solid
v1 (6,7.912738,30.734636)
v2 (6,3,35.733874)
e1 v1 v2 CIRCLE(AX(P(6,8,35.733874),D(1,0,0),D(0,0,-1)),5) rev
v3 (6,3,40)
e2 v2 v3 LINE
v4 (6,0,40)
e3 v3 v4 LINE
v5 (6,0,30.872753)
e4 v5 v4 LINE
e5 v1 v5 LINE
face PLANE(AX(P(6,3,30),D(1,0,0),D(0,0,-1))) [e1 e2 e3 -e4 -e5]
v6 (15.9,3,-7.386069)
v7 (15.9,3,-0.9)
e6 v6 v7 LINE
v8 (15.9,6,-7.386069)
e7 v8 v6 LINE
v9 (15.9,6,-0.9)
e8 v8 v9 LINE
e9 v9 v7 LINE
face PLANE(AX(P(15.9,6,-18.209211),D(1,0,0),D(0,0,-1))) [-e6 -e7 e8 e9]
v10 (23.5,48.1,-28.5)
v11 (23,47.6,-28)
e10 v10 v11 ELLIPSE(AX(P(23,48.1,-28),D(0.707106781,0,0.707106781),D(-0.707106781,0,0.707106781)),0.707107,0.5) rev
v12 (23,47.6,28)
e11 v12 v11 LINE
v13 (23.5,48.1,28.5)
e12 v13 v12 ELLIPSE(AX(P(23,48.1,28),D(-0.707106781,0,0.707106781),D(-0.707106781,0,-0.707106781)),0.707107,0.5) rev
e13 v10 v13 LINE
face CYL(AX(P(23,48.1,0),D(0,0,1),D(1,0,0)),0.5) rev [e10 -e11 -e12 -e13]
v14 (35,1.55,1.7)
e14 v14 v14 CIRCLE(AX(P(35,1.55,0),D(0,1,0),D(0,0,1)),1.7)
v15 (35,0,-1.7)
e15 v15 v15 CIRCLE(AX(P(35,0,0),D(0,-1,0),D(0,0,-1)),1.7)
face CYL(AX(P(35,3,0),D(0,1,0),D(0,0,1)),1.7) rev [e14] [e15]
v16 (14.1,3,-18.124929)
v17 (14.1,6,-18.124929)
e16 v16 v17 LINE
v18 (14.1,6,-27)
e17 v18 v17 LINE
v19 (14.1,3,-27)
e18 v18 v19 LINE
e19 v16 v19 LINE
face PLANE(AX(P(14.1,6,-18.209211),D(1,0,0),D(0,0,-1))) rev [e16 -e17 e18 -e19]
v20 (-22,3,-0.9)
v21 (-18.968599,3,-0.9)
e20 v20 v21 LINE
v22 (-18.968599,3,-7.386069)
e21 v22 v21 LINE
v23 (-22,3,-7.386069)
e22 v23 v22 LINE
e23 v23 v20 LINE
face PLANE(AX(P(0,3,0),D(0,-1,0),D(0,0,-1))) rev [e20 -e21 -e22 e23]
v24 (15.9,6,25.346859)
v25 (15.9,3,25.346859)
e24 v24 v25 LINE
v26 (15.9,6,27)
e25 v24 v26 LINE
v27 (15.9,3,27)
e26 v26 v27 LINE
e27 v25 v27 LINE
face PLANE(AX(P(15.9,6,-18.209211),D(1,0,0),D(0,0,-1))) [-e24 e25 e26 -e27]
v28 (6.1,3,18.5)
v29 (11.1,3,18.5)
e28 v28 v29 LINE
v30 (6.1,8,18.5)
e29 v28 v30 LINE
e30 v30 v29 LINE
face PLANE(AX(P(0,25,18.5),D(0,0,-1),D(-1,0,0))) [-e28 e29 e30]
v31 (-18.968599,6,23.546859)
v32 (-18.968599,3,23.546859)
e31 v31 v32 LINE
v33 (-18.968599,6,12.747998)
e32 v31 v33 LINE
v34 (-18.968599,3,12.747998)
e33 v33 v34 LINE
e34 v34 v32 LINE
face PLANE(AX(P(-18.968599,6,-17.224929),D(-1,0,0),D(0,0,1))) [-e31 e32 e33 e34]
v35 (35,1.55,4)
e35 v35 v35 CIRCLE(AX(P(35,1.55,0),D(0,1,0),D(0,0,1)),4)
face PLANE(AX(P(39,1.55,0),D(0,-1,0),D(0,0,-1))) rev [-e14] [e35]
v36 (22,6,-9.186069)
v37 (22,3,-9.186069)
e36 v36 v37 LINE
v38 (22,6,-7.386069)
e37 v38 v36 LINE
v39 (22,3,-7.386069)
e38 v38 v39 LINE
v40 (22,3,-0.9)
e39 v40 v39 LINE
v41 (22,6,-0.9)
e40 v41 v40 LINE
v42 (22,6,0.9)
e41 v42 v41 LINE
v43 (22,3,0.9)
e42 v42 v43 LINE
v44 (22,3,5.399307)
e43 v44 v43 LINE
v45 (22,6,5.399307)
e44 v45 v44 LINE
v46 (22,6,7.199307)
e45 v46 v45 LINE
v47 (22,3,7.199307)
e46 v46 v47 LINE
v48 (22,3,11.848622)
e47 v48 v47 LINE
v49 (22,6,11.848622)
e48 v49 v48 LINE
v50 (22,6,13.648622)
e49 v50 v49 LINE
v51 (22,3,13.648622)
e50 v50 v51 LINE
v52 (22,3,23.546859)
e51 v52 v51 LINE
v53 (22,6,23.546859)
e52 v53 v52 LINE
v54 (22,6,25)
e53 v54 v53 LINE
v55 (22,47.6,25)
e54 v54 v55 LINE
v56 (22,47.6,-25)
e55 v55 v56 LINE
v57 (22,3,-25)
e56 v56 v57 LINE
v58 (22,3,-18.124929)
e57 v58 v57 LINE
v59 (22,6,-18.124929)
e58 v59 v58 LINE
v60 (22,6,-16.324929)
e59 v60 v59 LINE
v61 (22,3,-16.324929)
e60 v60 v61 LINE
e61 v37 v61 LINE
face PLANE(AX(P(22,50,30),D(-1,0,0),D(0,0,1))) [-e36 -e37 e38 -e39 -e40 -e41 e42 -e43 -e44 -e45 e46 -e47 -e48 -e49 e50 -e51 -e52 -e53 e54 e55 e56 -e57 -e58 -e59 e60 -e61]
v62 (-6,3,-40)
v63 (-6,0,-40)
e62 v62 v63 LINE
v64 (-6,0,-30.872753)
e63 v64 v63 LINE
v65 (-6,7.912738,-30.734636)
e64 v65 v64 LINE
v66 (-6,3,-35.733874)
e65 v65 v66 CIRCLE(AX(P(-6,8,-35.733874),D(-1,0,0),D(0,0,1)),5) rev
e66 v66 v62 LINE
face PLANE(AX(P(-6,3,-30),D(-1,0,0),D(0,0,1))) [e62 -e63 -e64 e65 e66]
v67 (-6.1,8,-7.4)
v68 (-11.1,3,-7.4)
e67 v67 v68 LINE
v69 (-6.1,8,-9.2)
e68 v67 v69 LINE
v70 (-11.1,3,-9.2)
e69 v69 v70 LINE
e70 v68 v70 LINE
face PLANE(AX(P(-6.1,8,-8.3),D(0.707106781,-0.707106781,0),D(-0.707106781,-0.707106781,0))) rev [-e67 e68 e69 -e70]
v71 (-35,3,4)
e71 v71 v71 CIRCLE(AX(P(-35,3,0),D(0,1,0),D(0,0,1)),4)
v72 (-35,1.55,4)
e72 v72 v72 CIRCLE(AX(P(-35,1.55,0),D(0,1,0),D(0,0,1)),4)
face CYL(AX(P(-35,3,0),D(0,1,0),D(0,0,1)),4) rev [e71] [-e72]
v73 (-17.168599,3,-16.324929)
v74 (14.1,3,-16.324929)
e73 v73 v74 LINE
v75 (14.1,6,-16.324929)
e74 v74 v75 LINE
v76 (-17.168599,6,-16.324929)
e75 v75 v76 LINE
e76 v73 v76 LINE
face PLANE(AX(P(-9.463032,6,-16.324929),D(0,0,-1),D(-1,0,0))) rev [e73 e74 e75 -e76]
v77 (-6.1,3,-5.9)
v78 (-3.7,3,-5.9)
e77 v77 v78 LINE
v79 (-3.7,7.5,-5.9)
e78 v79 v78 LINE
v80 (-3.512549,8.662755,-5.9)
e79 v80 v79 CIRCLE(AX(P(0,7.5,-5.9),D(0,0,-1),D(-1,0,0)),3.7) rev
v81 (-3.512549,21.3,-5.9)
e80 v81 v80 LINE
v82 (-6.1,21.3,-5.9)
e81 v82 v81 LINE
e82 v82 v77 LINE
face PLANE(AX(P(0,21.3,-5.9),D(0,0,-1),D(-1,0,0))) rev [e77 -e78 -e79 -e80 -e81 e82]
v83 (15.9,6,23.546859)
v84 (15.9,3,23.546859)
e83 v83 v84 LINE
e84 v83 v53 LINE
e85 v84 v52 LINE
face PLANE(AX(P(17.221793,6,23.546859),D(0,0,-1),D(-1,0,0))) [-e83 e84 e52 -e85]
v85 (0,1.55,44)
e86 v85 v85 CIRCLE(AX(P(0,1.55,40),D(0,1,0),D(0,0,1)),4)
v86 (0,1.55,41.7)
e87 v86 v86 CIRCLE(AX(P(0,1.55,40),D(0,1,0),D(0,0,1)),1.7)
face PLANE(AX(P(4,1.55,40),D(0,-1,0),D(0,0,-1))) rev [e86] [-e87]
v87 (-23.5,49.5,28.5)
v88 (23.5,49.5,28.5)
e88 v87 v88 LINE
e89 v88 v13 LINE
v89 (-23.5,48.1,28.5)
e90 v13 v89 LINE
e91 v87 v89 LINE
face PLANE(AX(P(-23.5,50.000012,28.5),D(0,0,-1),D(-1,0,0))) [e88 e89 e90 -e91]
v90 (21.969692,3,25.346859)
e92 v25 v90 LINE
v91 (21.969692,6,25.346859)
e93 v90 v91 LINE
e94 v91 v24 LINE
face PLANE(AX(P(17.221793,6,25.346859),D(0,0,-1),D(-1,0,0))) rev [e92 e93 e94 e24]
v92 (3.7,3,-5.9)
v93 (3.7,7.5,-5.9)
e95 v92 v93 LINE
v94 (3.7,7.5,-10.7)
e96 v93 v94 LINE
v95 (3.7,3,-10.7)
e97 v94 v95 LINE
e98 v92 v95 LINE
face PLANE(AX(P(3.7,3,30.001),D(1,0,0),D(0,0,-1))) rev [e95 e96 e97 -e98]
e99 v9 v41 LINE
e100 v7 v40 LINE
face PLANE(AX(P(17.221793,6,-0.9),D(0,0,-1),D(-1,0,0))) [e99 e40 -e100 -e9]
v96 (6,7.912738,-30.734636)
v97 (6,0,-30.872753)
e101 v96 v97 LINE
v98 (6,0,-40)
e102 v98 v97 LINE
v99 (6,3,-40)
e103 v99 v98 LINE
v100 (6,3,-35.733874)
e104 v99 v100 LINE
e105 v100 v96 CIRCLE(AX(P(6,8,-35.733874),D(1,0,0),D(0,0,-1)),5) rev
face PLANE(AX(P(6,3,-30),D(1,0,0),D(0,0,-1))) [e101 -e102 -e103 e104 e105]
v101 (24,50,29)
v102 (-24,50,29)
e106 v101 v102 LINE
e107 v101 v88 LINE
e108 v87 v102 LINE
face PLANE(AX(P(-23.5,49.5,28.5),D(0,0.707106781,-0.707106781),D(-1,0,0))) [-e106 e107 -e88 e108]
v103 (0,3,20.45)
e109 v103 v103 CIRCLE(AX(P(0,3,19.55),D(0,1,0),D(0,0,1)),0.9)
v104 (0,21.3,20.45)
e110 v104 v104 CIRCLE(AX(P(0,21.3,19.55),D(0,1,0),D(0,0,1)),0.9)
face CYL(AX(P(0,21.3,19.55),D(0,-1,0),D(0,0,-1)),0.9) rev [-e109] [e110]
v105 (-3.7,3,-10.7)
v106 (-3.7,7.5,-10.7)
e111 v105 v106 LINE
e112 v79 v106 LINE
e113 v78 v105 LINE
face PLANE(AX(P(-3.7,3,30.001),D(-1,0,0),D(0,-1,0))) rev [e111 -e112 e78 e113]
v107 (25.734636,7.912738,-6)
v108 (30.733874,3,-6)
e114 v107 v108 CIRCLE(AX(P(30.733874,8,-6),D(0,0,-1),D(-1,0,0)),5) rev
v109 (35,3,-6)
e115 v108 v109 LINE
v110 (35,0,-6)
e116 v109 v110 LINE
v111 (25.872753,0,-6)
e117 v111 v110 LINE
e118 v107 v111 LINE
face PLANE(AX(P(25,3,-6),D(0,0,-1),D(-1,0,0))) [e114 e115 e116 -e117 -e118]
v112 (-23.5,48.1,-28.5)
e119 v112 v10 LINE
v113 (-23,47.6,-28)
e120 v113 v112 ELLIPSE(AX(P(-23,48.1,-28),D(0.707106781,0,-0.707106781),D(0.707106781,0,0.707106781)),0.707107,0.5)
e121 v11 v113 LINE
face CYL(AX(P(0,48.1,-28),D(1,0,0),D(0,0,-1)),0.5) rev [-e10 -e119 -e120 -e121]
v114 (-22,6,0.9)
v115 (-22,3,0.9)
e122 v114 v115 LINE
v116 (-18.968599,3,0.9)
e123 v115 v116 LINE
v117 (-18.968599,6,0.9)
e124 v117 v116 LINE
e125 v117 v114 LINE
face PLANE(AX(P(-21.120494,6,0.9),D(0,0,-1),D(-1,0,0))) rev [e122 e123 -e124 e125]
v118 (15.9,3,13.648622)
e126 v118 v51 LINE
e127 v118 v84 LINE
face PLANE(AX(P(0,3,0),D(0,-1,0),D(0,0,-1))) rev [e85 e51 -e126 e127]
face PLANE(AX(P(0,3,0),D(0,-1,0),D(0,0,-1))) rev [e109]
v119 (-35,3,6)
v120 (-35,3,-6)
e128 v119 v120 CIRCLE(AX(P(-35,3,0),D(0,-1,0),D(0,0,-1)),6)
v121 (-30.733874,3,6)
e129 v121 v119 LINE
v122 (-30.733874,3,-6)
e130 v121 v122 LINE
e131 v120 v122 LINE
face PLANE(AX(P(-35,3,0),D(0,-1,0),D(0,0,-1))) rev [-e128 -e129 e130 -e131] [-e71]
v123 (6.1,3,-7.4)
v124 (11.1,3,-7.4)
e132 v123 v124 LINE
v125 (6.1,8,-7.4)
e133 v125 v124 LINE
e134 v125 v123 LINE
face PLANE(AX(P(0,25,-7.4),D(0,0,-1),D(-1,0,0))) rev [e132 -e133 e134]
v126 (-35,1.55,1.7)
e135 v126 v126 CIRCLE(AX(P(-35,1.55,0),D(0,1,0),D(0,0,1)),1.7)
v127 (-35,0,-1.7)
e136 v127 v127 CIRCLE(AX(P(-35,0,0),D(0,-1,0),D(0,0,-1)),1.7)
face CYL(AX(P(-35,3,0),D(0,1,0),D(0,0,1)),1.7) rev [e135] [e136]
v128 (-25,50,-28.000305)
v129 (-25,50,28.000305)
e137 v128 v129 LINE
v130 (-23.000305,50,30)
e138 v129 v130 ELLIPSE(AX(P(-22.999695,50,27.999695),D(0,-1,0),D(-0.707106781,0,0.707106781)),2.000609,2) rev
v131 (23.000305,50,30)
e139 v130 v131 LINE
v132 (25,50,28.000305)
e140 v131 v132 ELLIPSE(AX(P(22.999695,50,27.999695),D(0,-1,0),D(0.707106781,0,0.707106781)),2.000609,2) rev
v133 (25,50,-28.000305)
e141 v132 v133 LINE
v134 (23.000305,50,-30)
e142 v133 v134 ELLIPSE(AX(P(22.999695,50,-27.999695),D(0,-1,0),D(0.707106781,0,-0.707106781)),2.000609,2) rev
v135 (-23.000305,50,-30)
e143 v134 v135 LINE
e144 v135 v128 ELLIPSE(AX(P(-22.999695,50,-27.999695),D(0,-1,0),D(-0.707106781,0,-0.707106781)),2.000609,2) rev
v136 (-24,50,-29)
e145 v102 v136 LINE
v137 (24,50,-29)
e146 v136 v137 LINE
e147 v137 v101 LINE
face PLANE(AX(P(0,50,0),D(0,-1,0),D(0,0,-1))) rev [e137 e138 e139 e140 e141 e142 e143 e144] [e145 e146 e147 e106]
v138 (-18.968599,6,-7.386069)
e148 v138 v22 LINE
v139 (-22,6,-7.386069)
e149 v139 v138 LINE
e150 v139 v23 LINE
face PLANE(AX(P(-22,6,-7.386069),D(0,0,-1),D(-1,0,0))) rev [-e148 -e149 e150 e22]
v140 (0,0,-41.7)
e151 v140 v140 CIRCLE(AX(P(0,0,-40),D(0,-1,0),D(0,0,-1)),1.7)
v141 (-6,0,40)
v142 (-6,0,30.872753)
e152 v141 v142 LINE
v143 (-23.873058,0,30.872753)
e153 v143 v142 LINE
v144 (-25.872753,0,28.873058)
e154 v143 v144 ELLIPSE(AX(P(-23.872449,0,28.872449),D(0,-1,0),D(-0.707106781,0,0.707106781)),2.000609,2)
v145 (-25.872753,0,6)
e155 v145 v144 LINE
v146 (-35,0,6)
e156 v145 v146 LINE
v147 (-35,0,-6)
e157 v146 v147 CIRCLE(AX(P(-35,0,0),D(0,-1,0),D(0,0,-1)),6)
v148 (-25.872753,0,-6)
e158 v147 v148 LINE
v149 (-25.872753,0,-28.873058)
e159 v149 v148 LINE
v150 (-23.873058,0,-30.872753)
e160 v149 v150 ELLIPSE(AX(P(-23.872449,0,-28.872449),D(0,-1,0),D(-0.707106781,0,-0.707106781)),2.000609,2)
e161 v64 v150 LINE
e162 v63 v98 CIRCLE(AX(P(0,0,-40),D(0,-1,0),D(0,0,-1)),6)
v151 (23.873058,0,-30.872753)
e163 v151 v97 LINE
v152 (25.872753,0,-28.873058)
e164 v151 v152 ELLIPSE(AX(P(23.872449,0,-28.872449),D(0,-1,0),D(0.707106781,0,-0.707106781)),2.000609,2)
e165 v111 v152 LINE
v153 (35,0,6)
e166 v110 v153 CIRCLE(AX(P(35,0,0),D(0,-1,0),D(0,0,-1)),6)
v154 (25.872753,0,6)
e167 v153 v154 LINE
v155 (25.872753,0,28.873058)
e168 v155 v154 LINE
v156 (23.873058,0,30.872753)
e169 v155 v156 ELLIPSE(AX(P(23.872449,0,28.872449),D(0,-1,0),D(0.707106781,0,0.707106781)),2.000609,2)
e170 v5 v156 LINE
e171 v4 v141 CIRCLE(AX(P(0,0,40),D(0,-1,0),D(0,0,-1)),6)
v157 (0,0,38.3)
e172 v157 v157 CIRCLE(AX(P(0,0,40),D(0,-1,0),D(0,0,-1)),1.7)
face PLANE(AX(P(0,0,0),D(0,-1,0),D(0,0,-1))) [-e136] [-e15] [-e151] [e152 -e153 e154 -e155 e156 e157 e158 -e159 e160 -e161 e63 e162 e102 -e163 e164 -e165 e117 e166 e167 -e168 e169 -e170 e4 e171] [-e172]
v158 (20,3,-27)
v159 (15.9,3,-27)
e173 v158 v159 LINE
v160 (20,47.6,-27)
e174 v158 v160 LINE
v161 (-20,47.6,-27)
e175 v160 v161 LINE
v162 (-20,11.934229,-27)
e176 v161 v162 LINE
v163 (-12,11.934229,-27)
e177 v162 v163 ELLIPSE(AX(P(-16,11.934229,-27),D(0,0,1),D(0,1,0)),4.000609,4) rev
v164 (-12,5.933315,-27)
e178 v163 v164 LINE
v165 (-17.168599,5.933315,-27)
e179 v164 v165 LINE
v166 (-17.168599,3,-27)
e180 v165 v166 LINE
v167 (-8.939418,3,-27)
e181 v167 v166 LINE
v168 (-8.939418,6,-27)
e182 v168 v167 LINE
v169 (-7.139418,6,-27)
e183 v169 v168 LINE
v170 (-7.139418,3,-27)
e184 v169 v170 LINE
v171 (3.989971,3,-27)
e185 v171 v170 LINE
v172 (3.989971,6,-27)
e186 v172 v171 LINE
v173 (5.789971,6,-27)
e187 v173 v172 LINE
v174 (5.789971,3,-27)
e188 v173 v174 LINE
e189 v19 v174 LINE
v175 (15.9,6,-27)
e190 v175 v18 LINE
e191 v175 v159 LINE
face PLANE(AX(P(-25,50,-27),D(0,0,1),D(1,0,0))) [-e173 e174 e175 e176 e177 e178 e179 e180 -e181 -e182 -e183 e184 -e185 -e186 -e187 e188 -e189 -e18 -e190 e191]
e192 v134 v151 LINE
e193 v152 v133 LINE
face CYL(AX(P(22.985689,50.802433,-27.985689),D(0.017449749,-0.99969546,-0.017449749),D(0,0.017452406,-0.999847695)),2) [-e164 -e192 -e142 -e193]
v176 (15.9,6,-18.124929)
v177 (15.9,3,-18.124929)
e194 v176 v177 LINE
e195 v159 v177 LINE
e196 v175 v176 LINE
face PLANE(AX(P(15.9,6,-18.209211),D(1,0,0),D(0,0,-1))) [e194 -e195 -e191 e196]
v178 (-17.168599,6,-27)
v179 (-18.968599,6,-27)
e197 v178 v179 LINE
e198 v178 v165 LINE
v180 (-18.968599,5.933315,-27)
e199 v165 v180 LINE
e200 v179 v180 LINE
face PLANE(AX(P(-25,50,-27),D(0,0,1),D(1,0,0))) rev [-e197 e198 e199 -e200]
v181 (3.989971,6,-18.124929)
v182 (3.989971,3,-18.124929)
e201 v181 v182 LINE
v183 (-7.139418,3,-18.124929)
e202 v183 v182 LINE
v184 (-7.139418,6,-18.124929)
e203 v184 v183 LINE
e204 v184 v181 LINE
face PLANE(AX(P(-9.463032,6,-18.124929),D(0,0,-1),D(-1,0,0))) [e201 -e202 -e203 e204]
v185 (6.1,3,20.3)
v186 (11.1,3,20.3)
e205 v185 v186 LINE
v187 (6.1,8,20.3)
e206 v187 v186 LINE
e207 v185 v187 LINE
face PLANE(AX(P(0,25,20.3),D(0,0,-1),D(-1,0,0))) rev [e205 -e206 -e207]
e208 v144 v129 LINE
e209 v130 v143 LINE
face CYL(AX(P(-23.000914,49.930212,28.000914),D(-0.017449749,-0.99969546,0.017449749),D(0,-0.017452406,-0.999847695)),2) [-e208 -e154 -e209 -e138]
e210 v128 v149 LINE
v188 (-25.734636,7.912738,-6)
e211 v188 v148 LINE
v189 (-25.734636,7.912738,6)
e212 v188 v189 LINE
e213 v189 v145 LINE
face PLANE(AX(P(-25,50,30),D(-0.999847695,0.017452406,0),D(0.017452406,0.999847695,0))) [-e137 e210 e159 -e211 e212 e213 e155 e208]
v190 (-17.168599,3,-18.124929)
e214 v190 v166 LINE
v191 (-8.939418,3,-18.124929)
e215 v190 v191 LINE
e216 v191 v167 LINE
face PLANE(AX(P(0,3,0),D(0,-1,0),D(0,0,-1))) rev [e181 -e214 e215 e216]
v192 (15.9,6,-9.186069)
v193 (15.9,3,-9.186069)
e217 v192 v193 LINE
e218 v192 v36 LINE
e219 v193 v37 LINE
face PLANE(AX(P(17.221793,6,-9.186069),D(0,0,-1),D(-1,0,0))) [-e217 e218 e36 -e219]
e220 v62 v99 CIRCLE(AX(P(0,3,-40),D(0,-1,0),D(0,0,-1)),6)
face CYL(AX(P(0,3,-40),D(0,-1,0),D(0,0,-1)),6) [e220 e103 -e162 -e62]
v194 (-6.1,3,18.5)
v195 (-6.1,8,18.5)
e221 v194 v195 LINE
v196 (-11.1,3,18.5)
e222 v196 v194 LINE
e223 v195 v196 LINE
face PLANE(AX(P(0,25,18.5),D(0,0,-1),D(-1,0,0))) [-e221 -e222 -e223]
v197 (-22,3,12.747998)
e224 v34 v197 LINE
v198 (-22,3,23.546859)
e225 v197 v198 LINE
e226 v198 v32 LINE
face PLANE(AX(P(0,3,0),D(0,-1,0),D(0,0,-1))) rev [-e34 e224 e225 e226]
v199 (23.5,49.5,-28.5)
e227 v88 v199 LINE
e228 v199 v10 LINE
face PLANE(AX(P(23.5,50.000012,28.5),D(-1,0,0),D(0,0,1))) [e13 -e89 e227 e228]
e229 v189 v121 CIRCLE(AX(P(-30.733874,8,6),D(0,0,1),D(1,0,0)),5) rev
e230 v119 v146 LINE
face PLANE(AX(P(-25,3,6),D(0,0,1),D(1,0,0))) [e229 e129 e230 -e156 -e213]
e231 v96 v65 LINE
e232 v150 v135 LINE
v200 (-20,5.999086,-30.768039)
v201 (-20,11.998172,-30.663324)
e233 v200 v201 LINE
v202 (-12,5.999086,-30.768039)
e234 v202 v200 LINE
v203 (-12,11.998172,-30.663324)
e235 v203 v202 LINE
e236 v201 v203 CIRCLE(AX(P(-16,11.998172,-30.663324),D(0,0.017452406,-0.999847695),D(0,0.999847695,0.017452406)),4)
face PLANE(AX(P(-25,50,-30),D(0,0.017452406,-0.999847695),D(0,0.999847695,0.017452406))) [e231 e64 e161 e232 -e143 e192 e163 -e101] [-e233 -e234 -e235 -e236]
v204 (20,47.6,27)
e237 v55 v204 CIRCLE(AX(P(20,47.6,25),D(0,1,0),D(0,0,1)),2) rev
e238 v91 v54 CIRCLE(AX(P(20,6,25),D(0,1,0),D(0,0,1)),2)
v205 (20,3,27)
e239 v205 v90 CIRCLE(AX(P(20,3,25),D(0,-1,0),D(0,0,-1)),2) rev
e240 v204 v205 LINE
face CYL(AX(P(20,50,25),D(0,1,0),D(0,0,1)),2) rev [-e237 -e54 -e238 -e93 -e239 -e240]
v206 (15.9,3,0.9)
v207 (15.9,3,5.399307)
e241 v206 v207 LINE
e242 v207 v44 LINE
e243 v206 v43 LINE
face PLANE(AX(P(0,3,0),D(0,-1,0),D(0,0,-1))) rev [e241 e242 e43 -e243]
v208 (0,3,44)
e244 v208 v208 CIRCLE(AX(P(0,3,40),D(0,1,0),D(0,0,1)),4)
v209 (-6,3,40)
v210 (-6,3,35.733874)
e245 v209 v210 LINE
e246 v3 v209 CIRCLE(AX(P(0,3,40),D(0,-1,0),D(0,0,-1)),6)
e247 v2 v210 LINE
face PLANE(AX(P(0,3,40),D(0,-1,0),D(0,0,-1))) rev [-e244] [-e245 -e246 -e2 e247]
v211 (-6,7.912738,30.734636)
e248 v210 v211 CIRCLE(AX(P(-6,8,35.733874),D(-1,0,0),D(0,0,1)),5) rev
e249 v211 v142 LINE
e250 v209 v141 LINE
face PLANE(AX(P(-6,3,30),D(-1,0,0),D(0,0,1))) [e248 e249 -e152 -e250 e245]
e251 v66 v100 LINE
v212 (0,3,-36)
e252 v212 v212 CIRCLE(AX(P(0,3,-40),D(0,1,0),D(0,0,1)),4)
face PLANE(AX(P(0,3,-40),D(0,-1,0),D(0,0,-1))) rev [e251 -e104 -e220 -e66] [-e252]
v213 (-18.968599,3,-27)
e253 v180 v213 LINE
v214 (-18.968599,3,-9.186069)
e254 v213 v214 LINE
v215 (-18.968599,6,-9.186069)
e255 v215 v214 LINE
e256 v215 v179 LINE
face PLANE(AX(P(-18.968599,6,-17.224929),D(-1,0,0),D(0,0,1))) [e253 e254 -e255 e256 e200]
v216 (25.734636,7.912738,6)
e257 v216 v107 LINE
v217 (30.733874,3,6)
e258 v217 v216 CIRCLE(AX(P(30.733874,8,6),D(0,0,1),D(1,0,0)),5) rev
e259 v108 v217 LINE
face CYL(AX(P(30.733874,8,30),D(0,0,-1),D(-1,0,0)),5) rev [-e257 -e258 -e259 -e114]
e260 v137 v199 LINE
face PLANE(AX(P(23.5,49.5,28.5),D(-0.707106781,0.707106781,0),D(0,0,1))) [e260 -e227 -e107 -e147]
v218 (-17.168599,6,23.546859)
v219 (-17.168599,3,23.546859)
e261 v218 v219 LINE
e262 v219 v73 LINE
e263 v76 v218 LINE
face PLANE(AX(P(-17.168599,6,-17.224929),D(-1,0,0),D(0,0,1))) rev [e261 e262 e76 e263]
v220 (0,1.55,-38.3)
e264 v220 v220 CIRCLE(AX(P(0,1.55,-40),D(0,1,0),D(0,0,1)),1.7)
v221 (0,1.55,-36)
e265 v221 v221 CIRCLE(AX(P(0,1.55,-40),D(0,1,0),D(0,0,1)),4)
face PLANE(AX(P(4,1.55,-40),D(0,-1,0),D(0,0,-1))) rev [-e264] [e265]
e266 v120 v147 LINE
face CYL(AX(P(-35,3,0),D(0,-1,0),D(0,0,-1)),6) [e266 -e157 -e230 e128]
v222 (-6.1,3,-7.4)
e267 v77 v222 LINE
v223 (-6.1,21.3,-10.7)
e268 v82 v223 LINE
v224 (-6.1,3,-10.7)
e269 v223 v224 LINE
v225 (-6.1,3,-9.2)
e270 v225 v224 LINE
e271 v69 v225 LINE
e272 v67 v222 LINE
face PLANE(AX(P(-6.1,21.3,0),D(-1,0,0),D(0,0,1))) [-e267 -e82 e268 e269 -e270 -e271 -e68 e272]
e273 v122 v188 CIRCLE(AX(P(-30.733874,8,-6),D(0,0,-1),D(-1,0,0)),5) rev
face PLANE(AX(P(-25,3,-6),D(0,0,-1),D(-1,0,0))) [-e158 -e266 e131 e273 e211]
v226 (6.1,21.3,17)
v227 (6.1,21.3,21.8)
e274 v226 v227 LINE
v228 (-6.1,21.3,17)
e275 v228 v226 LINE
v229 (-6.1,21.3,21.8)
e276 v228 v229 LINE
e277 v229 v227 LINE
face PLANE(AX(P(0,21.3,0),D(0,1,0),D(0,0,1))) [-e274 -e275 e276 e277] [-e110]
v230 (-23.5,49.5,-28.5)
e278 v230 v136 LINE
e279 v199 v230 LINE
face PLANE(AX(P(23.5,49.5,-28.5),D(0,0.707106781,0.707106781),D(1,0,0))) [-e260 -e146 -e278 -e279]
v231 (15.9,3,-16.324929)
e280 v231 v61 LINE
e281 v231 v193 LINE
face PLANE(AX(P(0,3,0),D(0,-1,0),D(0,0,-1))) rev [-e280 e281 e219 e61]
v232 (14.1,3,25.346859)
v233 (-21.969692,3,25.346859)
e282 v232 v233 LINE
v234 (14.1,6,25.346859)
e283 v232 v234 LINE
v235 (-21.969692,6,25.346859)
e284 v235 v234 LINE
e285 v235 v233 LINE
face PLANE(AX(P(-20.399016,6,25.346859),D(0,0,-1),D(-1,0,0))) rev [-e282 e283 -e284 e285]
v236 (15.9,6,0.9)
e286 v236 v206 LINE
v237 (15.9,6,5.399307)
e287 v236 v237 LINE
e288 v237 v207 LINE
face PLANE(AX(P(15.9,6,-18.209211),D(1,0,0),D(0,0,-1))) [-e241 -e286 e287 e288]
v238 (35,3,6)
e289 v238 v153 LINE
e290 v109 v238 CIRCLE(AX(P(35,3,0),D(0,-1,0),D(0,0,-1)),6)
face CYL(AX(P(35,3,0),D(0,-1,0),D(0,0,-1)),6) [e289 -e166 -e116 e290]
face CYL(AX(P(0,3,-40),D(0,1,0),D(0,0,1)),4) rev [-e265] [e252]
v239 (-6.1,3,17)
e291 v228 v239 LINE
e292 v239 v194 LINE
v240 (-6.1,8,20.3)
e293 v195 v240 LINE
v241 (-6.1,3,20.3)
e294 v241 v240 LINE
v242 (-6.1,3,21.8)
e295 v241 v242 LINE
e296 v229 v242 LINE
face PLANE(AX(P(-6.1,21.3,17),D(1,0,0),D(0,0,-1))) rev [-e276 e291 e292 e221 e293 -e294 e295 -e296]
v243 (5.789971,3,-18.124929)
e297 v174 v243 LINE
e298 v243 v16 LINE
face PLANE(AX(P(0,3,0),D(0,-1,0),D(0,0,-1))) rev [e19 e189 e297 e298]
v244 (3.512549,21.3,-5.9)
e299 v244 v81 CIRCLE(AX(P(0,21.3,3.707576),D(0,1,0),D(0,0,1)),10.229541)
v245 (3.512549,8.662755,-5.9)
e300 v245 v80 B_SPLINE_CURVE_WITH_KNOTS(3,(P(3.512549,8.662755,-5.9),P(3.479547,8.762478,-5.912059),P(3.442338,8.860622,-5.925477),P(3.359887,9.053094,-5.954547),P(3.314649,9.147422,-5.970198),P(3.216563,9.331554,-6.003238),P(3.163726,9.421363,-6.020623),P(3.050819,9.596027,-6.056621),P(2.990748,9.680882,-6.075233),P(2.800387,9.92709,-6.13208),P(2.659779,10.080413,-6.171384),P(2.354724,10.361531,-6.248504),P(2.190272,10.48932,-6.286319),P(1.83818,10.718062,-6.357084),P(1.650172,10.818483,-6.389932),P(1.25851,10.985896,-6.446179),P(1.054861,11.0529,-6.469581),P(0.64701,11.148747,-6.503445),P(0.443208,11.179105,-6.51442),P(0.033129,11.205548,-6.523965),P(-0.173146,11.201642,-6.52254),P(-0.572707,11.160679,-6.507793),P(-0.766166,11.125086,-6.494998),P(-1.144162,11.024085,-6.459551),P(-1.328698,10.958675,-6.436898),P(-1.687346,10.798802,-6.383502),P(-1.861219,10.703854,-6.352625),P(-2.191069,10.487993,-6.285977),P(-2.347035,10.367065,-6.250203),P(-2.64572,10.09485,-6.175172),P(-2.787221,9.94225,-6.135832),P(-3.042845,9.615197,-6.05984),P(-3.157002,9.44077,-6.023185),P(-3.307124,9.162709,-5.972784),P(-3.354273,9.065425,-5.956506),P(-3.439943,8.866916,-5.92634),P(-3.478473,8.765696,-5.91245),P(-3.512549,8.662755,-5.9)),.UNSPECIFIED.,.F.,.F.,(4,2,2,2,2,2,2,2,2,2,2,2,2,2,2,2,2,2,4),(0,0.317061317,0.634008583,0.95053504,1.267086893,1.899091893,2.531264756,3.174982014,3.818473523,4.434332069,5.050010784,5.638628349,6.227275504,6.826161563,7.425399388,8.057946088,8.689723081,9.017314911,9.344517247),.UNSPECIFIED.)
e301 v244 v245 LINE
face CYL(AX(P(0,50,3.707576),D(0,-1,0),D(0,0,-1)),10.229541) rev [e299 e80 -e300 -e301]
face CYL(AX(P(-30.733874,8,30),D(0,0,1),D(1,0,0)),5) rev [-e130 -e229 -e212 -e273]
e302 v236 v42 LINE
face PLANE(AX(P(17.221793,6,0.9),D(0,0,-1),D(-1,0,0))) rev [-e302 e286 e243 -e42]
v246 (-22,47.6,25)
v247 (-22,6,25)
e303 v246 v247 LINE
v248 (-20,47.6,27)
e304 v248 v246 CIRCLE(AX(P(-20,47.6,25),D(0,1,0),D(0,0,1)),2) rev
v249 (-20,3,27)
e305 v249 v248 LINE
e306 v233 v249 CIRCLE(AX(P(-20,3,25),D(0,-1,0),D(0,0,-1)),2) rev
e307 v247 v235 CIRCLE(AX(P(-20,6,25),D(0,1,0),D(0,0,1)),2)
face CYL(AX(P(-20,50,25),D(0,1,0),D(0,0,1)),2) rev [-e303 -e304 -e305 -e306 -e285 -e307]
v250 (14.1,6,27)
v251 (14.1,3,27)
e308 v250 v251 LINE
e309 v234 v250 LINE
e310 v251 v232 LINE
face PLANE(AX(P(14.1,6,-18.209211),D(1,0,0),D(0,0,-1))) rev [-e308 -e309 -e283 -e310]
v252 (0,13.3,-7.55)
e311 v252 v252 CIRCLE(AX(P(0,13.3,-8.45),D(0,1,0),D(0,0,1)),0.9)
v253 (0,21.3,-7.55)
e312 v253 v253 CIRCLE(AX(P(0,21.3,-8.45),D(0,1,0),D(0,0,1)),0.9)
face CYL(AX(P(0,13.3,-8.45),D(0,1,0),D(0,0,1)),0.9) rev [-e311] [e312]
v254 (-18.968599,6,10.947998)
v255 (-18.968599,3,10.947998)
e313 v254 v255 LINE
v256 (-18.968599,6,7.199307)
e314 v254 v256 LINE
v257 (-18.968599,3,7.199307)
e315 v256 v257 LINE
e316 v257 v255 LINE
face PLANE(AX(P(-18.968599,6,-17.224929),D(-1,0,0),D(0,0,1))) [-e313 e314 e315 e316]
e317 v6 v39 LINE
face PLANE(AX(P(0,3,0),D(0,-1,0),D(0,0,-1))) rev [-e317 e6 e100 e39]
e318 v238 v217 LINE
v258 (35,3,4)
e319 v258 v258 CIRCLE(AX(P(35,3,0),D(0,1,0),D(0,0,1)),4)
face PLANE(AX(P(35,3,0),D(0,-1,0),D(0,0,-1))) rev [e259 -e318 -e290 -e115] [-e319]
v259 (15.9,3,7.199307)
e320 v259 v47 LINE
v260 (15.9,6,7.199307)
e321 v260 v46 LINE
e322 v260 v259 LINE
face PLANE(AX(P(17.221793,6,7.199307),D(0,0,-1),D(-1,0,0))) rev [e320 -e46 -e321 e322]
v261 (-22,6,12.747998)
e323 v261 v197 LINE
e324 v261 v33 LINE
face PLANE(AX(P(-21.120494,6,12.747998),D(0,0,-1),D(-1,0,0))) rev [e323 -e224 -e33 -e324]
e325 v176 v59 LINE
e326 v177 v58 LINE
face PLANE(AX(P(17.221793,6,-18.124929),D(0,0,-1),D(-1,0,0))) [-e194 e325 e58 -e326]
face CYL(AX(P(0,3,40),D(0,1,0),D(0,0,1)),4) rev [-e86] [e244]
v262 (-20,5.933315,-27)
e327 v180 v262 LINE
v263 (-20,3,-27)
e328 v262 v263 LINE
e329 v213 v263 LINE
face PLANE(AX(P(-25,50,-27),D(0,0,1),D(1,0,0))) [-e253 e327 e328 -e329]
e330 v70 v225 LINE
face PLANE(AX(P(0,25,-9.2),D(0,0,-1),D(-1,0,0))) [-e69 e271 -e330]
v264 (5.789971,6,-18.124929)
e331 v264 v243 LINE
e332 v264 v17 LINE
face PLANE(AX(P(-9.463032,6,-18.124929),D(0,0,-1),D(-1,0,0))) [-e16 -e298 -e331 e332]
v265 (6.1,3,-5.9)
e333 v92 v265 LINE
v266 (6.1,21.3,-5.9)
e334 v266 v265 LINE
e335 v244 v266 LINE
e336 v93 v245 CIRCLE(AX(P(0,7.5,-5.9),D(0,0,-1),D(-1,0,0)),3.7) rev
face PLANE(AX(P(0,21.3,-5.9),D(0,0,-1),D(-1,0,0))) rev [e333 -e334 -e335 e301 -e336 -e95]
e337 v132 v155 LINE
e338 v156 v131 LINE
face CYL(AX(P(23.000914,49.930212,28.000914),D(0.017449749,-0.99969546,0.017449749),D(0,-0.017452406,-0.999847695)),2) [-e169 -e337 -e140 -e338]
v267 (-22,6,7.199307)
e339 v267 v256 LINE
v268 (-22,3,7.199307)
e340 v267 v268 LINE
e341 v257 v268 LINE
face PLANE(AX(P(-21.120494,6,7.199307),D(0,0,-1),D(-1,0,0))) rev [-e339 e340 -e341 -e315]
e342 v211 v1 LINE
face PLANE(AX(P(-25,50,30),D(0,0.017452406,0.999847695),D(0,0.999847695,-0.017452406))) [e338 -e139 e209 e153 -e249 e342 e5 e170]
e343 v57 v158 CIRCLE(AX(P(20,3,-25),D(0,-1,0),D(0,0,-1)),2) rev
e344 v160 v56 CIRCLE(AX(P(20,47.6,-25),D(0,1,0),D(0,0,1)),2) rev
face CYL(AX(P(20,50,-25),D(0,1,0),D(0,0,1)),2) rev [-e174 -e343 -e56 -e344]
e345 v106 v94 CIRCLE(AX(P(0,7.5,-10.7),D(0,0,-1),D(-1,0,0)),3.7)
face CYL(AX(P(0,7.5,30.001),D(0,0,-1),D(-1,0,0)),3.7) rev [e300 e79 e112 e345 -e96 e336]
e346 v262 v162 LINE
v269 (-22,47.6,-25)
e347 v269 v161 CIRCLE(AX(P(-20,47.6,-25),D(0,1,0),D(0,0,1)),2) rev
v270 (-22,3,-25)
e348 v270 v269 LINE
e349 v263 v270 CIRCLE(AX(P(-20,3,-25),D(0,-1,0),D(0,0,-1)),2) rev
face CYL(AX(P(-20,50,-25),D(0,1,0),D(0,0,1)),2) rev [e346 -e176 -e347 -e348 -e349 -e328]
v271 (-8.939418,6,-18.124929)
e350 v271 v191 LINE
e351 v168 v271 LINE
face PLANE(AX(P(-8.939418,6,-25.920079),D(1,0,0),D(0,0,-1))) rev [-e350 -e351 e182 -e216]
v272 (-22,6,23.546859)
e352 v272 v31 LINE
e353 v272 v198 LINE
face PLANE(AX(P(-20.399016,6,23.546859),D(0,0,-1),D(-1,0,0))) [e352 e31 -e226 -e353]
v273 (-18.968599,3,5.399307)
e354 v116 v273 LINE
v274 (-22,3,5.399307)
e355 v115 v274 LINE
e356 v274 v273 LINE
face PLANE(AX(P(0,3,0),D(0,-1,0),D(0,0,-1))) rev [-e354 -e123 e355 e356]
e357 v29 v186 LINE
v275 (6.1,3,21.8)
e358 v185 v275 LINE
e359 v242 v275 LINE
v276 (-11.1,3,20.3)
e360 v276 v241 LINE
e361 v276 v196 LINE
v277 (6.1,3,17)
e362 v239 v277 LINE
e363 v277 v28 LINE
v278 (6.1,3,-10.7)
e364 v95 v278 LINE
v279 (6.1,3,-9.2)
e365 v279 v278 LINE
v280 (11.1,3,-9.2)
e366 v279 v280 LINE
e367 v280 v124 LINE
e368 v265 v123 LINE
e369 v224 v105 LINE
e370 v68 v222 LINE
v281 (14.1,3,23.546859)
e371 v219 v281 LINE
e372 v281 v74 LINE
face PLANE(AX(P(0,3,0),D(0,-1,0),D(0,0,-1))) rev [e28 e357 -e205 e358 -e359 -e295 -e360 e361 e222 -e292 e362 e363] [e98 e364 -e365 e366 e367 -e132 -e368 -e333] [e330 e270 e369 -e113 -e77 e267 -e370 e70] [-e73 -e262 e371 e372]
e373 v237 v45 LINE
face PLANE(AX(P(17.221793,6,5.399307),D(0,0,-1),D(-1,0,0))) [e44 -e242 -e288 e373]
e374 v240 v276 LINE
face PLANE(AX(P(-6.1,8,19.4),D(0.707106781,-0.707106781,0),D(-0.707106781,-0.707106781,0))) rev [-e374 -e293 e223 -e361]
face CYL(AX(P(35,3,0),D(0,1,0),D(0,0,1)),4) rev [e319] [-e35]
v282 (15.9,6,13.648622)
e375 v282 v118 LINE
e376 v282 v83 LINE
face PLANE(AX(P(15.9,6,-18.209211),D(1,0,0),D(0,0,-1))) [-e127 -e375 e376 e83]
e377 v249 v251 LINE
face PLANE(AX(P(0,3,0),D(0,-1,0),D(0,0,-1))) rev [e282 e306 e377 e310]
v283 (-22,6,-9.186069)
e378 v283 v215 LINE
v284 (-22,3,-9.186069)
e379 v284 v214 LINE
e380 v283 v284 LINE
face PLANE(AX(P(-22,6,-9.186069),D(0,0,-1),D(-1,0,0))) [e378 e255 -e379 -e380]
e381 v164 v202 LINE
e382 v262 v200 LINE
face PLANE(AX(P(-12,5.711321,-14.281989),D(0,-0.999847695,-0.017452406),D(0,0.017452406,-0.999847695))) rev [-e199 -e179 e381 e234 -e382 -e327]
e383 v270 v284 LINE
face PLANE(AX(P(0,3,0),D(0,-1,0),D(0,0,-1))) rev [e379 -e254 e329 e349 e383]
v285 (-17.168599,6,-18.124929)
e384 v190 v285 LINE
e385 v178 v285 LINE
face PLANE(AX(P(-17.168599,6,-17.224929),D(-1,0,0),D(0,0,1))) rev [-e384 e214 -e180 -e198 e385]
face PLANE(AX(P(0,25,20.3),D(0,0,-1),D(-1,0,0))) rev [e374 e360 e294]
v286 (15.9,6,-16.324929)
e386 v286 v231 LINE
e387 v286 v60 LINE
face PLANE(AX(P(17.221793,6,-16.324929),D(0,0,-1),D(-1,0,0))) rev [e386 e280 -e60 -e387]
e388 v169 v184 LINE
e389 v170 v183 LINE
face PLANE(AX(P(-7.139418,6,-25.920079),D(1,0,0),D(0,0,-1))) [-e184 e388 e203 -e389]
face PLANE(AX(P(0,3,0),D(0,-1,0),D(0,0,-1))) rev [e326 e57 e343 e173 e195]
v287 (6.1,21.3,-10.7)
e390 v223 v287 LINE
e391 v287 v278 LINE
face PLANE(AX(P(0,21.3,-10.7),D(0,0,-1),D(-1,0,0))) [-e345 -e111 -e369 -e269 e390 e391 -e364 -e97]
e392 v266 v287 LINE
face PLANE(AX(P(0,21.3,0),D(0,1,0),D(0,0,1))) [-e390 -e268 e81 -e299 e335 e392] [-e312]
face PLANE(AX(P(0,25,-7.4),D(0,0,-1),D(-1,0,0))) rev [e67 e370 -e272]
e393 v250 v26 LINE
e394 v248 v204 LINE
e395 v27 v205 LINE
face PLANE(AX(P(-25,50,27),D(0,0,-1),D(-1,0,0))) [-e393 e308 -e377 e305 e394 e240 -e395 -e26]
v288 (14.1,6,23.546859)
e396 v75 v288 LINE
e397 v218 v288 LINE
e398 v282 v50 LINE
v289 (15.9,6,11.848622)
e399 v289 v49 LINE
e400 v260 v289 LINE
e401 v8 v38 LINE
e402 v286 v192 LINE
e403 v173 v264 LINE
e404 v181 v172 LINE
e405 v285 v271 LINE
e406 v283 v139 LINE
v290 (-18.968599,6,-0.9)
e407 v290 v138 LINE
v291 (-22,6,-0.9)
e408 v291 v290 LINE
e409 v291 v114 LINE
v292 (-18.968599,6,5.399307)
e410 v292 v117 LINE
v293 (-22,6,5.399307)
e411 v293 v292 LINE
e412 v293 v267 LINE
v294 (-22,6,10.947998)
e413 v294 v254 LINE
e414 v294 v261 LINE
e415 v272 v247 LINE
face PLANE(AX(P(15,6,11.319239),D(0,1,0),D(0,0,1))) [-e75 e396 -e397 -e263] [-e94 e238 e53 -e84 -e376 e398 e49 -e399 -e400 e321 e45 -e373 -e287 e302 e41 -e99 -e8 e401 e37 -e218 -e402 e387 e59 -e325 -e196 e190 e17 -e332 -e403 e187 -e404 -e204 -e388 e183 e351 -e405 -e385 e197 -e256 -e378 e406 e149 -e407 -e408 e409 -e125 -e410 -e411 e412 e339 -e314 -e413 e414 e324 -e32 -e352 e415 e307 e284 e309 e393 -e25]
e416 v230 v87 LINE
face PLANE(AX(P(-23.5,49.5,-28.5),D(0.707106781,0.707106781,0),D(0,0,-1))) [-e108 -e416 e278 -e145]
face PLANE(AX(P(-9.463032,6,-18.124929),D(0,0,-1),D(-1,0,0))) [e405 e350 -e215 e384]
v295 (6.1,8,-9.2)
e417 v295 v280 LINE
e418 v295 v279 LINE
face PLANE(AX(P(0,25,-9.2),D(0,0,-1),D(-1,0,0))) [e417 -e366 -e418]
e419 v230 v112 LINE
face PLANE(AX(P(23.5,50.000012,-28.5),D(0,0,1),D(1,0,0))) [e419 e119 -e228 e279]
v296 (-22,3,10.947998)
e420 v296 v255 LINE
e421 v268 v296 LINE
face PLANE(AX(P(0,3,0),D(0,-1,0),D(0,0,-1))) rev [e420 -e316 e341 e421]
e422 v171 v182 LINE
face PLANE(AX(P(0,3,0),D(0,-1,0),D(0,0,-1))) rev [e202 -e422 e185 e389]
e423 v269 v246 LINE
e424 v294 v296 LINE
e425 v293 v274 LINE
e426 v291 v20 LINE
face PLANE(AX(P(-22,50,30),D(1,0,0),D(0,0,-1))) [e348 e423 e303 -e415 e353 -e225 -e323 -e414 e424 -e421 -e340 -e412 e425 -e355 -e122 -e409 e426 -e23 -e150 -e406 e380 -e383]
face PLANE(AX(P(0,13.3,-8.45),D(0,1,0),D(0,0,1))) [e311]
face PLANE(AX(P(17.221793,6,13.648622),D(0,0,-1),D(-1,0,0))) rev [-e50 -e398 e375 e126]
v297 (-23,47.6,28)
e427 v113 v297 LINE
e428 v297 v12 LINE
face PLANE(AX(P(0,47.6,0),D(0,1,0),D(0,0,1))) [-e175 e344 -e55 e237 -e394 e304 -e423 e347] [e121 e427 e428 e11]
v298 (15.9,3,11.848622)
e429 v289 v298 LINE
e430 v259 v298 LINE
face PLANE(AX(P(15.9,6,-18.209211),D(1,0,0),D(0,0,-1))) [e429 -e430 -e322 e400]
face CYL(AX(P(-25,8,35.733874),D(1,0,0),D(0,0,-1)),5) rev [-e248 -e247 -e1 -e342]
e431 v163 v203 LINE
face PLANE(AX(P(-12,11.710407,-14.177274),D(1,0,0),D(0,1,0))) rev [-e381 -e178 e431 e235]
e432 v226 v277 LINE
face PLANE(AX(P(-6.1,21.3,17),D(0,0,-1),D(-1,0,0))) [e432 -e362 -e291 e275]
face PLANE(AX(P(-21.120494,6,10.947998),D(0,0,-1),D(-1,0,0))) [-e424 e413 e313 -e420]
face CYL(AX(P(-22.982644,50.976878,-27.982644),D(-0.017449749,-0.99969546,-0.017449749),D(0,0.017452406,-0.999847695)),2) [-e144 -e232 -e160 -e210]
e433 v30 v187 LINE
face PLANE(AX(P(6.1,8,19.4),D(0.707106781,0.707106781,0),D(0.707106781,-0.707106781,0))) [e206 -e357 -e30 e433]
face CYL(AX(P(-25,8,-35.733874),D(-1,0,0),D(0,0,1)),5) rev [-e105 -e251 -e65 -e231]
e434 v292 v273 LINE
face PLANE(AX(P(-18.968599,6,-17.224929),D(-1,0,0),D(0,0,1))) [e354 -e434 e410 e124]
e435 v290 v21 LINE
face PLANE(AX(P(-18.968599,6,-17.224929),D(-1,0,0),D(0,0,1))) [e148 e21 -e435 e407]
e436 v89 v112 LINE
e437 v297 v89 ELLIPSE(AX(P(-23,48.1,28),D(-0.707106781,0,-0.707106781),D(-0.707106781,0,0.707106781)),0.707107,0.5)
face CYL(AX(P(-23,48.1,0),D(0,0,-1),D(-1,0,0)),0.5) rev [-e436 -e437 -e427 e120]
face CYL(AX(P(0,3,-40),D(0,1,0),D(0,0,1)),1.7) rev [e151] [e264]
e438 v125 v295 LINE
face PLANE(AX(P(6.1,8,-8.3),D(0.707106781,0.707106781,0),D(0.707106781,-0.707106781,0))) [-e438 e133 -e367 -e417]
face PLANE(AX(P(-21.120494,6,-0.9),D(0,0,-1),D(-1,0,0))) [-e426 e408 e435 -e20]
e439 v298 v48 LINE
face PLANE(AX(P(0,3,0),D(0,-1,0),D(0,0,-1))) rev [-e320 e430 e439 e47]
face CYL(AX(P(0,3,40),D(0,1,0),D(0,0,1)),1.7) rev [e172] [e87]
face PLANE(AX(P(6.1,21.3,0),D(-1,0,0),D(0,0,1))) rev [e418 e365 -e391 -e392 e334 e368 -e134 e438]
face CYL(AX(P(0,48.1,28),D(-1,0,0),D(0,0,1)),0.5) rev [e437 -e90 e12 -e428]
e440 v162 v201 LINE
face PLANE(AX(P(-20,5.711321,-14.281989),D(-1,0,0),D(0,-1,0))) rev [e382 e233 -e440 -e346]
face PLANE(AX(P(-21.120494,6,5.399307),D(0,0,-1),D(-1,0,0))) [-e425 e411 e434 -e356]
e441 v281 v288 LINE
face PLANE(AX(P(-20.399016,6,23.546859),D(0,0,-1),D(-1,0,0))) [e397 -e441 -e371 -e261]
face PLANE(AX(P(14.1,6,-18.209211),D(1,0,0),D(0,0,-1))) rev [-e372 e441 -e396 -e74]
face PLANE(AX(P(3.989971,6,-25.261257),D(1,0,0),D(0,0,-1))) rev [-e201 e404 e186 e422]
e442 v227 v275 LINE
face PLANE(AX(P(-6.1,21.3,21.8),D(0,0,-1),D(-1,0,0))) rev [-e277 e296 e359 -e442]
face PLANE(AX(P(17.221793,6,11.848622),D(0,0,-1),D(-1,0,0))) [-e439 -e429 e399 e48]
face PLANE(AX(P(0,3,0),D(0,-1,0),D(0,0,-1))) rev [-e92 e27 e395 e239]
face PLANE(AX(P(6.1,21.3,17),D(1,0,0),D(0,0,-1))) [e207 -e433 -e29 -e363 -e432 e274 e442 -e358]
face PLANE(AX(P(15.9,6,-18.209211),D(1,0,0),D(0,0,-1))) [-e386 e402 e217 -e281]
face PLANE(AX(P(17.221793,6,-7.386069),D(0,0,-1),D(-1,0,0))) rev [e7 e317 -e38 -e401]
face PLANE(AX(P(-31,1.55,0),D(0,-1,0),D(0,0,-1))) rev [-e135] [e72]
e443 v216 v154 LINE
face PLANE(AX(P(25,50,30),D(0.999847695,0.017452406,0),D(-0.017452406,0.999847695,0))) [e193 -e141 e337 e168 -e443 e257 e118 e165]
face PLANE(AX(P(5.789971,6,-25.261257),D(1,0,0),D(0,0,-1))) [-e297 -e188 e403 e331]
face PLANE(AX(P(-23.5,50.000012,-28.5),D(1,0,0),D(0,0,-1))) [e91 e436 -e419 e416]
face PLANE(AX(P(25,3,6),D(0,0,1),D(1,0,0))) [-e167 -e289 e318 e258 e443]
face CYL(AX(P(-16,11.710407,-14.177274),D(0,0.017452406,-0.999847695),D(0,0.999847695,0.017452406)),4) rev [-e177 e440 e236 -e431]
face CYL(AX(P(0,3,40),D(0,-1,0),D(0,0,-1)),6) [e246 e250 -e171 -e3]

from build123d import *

# Parameters (mm, degrees)
CROQUIS1_W                   = 50
CROQUIS1_H                   = 60
SALIENTE_EXTRUIR1_DEPTH      = 50
VACIADO1_T                   = -3
CROQUIS2_W                   = 12.2
CROQUIS2_H                   = 4.8
CROQUIS2_R                   = 0.9
SALIENTE_EXTRUIR2_DEPTH      = 18.3
CORTAR_EXTRUIR1_REACH        = 71.148
CORTAR_EXTRUIR2_START        = 18.3
CROQUIS2_3_R                 = 0.9
CORTAR_EXTRUIR2_DEPTH        = 8
CORTAR_EXTRUIR3_DEPTH        = 64.442887702
CORTAR_EXTRUIR3_DEPTH_BACK   = 2.4
CROQUIS5_W                   = 47
CROQUIS5_H                   = 57
REDONDEO1_R                  = 0.5
CHAFL_N1_SIZE                = 0.5
SALIENTE_EXTRUIR3_DEPTH      = 3
NGULO_DE_SALIDA5_ANGLE       = 1
REDONDEO3_R                  = 5
TALADROAVANZADO1_START       = 1.55
TALADROAVANZADO1_OUTLINE_R   = 4
TALADROAVANZADO1_DEPTH       = 1.45
TALADROAVANZADO1_2_OUTLINE_R = 1.7
TALADROAVANZADO1_2_DEPTH     = 1.55
NERVIO4_START                = -0.9
NERVIO4_DEPTH                = 1.8
NERVIO5_REACH                = 86.436
CROQUIS16_WALL_W             = 7.071067812
CROQUIS16_WALL_H             = 1.8
CORTAR_EXTRUIR8_DEPTH        = 68.975657408
CORTAR_EXTRUIR8_DEPTH_BACK   = 13
NERVIO9_START                = -3
NERVIO9_OUTLINE_W            = 31.268599093
NERVIO9_OUTLINE_H            = 39.871788568
NERVIO9_DEPTH                = 3
REDONDEO4_R                  = 2
REDONDEO5_R                  = 2
CORTAR_EXTRUIR9_REACH        = 102.177


# Read off the part's stored shape, not the designer's step: TaladroAvanzado1, Nervio4, Nervio9
with BuildPart() as part:
    # Croquis1 → Saliente-Extruir1 (new body)
    with BuildSketch(Plane(origin=(0, 0, 0), x_dir=(1, 0, 0), z_dir=(0, 1, 0))):
        Rectangle(CROQUIS1_W, CROQUIS1_H)
    extrude(amount=SALIENTE_EXTRUIR1_DEPTH)

    # Vaciado1
    vaciado1_openings = [part.faces().sort_by_distance(p)[0] for p in [
        (0, 50, 0),
    ]]
    offset(amount=VACIADO1_T, openings=vaciado1_openings, kind=Kind.INTERSECTION)

    # Croquis2 → Saliente-Extruir2 (add)
    # profile 1 of 2: a face of its own
    with BuildSketch(Plane(origin=(0, 3, 0), x_dir=(1, 0, 0), z_dir=(0, 1, 0))):
        with Locations((0, 8.3)):
            Rectangle(CROQUIS2_W, CROQUIS2_H)
    # profile 2 of 2: a face of its own
    with BuildSketch(Plane(origin=(0, 3, 0), x_dir=(1, 0, 0), z_dir=(0, 1, 0))):
        with Locations((0, -19.4)):
            Rectangle(CROQUIS2_W, CROQUIS2_H)
        with Locations(Location((0, -19.55, 0), (0, 0, 270))):
            Circle(CROQUIS2_R, mode=Mode.SUBTRACT)
    extrude(amount=SALIENTE_EXTRUIR2_DEPTH)

    # Croquis4 → Cortar-Extruir1 (cut, up to next)
    with BuildSketch(Plane(origin=(0, 0, -10.7), x_dir=(-1, 0, 0), z_dir=(0, 0, -1)), mode=Mode.PRIVATE) as cortar_extruir1_sk1:
        with BuildLine():
            Line((-3.7, 3), (3.7, 3))
            Line((3.7, 3), (3.7, 7.5))
            ThreePointArc((3.7, 7.5), (0, 11.2), (-3.7, 7.5))
            Line((-3.7, 7.5), (-3.7, 3))
        make_face()
    cortar_extruir1_tool1 = extrude(cortar_extruir1_sk1.sketch, amount=-CORTAR_EXTRUIR1_REACH, mode=Mode.PRIVATE) & part.part
    add(cortar_extruir1_tool1.solids().sort_by_distance((0, 6.74903, -10.7))[0], mode=Mode.SUBTRACT)

    # Croquis2<3> → Cortar-Extruir2 (cut)
    with BuildSketch(Plane(origin=(0, 3, 0), x_dir=(1, 0, 0), z_dir=(0, 1, 0)).offset(CORTAR_EXTRUIR2_START)):
        with Locations(Location((0, 8.45, 0), (0, 0, 270))):
            Circle(CROQUIS2_3_R)
    extrude(amount=-CORTAR_EXTRUIR2_DEPTH, mode=Mode.SUBTRACT)

    # Croquis5 → Cortar-Extruir3 (cut, two sides: drawn at the far end of the back side and taken through both)
    with BuildSketch(Plane(origin=(0, 50, 0), x_dir=(1, 0, 0), z_dir=(0, 1, 0)).offset(-CORTAR_EXTRUIR3_DEPTH_BACK)):
        Rectangle(CROQUIS5_W, CROQUIS5_H)
    extrude(amount=CORTAR_EXTRUIR3_DEPTH + CORTAR_EXTRUIR3_DEPTH_BACK, mode=Mode.SUBTRACT)

    # Redondeo1
    redondeo1_edges = [part.edges().sort_by_distance(p)[0] for p in [
        (0, 47.6, 28.5),
        (23.5, 47.6, 0),
        (0, 47.6, -28.5),
        (-23.5, 47.6, 0),
    ]]
    fillet(redondeo1_edges, radius=REDONDEO1_R)

    # Chaflán1
    chafl_n1_edges = [part.edges().sort_by_distance(p)[0] for p in [
        (0, 50, 28.5),
        (23.5, 50, 0),
        (0, 50, -28.5),
        (-23.5, 50, 0),
    ]]
    chamfer(chafl_n1_edges, length=CHAFL_N1_SIZE)

    # Croquis11 → Saliente-Extruir3 (add)
    with BuildSketch(Plane.XZ):
        with BuildLine():
            Line((-25, 6), (-35, 6))
            ThreePointArc((-35, 6), (-41, 0), (-35, -6))
            Line((-35, -6), (-25, -6))
            Line((-25, -6), (-25, 6))
        make_face()
        with BuildLine():
            Line((25, 6), (35, 6))
            ThreePointArc((35, 6), (41, 0), (35, -6))
            Line((35, -6), (25, -6))
            Line((25, -6), (25, 6))
        make_face()
        with BuildLine():
            Line((6, -30), (-6, -30))
            Line((-6, -30), (-6, -40))
            ThreePointArc((-6, -40), (0, -46), (6, -40))
            Line((6, -40), (6, -30))
        make_face()
        with BuildLine():
            Line((-6, 30), (6, 30))
            Line((6, 30), (6, 40))
            ThreePointArc((6, 40), (0, 46), (-6, 40))
            Line((-6, 40), (-6, 30))
        make_face()
    extrude(amount=-SALIENTE_EXTRUIR3_DEPTH)

    # Ángulo de salida5
    ngulo_de_salida5_faces = [part.faces().sort_by_distance(p)[0] for p in [
        (25, 25.285425101, 0),
        (0, 25.343344156, 30),
        (-25, 25.285425101, 0),
        (0, 25.343344156, -30),
    ]]
    draft(ngulo_de_salida5_faces, Plane.ZX.offset(50), NGULO_DE_SALIDA5_ANGLE)

    # Redondeo3
    redondeo3_edges = [part.edges().sort_by_distance(p)[0] for p in [
        (-25.820388052, 3, 0),
        (25.820388052, 3, 0),
        (0, 3, -30.820388052),
        (0, 3, 30.820388052),
    ]]
    fillet(redondeo3_edges, radius=REDONDEO3_R)

    # TaladroAvanzado1 outline → TaladroAvanzado1 (cut)
    with BuildSketch(Plane(origin=(0, 0, 0), x_dir=(1, 0, 0), z_dir=(0, 1, 0)).offset(TALADROAVANZADO1_START)):
        with Locations((0, -40)):
            Circle(TALADROAVANZADO1_OUTLINE_R)
        with Locations((0, 40)):
            Circle(TALADROAVANZADO1_OUTLINE_R)
        with Locations((-35, 0)):
            Circle(TALADROAVANZADO1_OUTLINE_R)
        with Locations((35, 0)):
            Circle(TALADROAVANZADO1_OUTLINE_R)
    extrude(amount=TALADROAVANZADO1_DEPTH, mode=Mode.SUBTRACT)

    # TaladroAvanzado1 2 outline → TaladroAvanzado1 2 (cut)
    with BuildSketch(Plane(origin=(0, 0, 0), x_dir=(1, 0, 0), z_dir=(0, 1, 0))):
        with Locations((0, -40)):
            Circle(TALADROAVANZADO1_2_OUTLINE_R)
        with Locations((0, 40)):
            Circle(TALADROAVANZADO1_2_OUTLINE_R)
        with Locations((-35, 0)):
            Circle(TALADROAVANZADO1_2_OUTLINE_R)
        with Locations((35, 0)):
            Circle(TALADROAVANZADO1_2_OUTLINE_R)
    extrude(amount=TALADROAVANZADO1_2_DEPTH, mode=Mode.SUBTRACT)

    # Nervio4 outline → Nervio4 (add)
    with BuildSketch(Plane(origin=(0, 0, 19.4), x_dir=(-1, 0, 0), z_dir=(0, 0, -1)).offset(NERVIO4_START)):
        Polygon((11.1, 3), (6.1, 8), (6.1, 3), align=None)
    nervio4 = extrude(amount=NERVIO4_DEPTH)

    # Simetría1: Nervio4 across plane
    add(nervio4.mirror(Plane(origin=(0, 0, 0), x_dir=(0, 0, 1), z_dir=(1, 0, 0))))

    # Croquis16 wall → Nervio5 (add, up to next)
    with BuildSketch(Plane(origin=(-8.6, 5.5, -8.3), x_dir=(-0.707106781187, -0.707106781187, 0), z_dir=(-0.707106781187, 0.707106781187, 0)), mode=Mode.PRIVATE) as nervio5_sk1:
        Rectangle(CROQUIS16_WALL_W, CROQUIS16_WALL_H)
    nervio5_tool1 = extrude(nervio5_sk1.sketch, amount=-NERVIO5_REACH, mode=Mode.PRIVATE) - part.part
    nervio5 = nervio5_tool1.solids().sort_by_distance((-8.6, 5.5, -8.3))[0]
    add(nervio5)

    # Simetría2: Nervio5 across plane
    add(nervio5.mirror(Plane(origin=(0, 0, 0), x_dir=(0, 0, 1), z_dir=(1, 0, 0))))

    # Croquis17 → Cortar-Extruir8 (cut, two sides: drawn at the far end of the back side and taken through both)
    with BuildSketch(Plane(origin=(0, 21.3, 0), x_dir=(1, 0, 0), z_dir=(0, 1, 0)).offset(-CORTAR_EXTRUIR8_DEPTH_BACK)):
        with BuildLine():
            ThreePointArc((3.512549094, 5.9), (0, 6.52196544), (-3.512549094, 5.9))
            Line((-3.512549094, 5.9), (3.512549094, 5.9))
        make_face()
    extrude(amount=CORTAR_EXTRUIR8_DEPTH + CORTAR_EXTRUIR8_DEPTH_BACK, mode=Mode.SUBTRACT)

    # Nervio9 outline → Nervio9 (add)
    with BuildSketch(Plane(origin=(0, 6, 0), x_dir=(1, 0, 0), z_dir=(0, 1, 0)).offset(NERVIO9_START)):
        Polygon((-22, -12.74799793), (-18.968599093, -12.74799793), (-18.968599093, -23.546859472), (-22, -23.546859472), (-22, -25.346859472), (14.1, -25.346859472), (14.1, -27), (15.9, -27), (15.9, -25.346859472), (22, -25.346859472), (22, -23.546859472), (15.9, -23.546859472), (15.9, -13.648622413), (22, -13.648622413), (22, -11.848622413), (15.9, -11.848622413), (15.9, -7.199306775), (22, -7.199306775), (22, -5.399306775), (15.9, -5.399306775), (15.9, -0.9), (22, -0.9), (22, 0.9), (15.9, 0.9), (15.9, 7.38606859), (22, 7.38606859), (22, 9.18606859), (15.9, 9.18606859), (15.9, 16.324929096), (22, 16.324929096), (22, 18.124929096), (15.9, 18.124929096), (15.9, 27), (14.1, 27), (14.1, 18.124929096), (5.7899715, 18.124929096), (5.7899715, 27), (3.9899715, 27), (3.9899715, 18.124929096), (-7.13941805, 18.124929096), (-7.13941805, 27), (-8.93941805, 27), (-8.93941805, 18.124929096), (-17.168599093, 18.124929096), (-17.168599093, 27), (-18.968599093, 27), (-18.968599093, 9.18606859), (-22, 9.18606859), (-22, 7.38606859), (-18.968599093, 7.38606859), (-18.968599093, 0.9), (-22, 0.9), (-22, -0.9), (-18.968599093, -0.9), (-18.968599093, -5.399306775), (-22, -5.399306775), (-22, -7.199306775), (-18.968599093, -7.199306775), (-18.968599093, -10.94799793), (-22, -10.94799793), align=None)
        with Locations((-1.534299546, -3.610965188)):
            Rectangle(NERVIO9_OUTLINE_W, NERVIO9_OUTLINE_H, mode=Mode.SUBTRACT)
    extrude(amount=NERVIO9_DEPTH)

    # Redondeo4
    redondeo4_edges = [part.edges().sort_by_distance(p)[0] for p in [
        (25.436376623, 25, 30.436376623),
        (-25.436376623, 25, 30.436376623),
        (-25.436376623, 25, -30.436376623),
        (25.436376623, 25, -30.436376623),
    ]]
    fillet(redondeo4_edges, radius=REDONDEO4_R)

    # Redondeo5
    redondeo5_edges = [part.edges().sort_by_distance(p)[0] for p in [
        (-22, 25.3, 27),
        (-22, 25.3, -27),
        (22, 25.3, -27),
        (22, 25.3, 27),
    ]]
    fillet(redondeo5_edges, radius=REDONDEO5_R)

    # Cortar-Extruir9: up to this plane
    cortar_extruir9_end = Plane(origin=(-25, 50, -27), z_dir=(0, 0, 1))
    # Croquis21 → Cortar-Extruir9 (cut, up to the surface)
    with BuildSketch(Plane(origin=(0, 0.538721775, -30.863349823), x_dir=(-1, 0, 0), z_dir=(0, 0.01745240643728355, -0.9998476951563913)), mode=Mode.PRIVATE) as cortar_extruir9_sk1:
        with BuildLine():
            Line((12, 5.461196163), (20, 5.461196163))
            Line((20, 5.461196163), (20, 11.461196163))
            ThreePointArc((20, 11.461196163), (16, 15.461196163), (12, 11.461196163))
            Line((12, 11.461196163), (12, 5.461196163))
        make_face()
    cortar_extruir9_tool1 = split(extrude(cortar_extruir9_sk1.sketch, amount=-CORTAR_EXTRUIR9_REACH, mode=Mode.PRIVATE), bisect_by=cortar_extruir9_end, keep=Keep.BOTH, mode=Mode.PRIVATE)
    add(cortar_extruir9_tool1.solids().sort_by_distance((-16, 10.612775, -30.687507))[0], mode=Mode.SUBTRACT)


solid = part.part
